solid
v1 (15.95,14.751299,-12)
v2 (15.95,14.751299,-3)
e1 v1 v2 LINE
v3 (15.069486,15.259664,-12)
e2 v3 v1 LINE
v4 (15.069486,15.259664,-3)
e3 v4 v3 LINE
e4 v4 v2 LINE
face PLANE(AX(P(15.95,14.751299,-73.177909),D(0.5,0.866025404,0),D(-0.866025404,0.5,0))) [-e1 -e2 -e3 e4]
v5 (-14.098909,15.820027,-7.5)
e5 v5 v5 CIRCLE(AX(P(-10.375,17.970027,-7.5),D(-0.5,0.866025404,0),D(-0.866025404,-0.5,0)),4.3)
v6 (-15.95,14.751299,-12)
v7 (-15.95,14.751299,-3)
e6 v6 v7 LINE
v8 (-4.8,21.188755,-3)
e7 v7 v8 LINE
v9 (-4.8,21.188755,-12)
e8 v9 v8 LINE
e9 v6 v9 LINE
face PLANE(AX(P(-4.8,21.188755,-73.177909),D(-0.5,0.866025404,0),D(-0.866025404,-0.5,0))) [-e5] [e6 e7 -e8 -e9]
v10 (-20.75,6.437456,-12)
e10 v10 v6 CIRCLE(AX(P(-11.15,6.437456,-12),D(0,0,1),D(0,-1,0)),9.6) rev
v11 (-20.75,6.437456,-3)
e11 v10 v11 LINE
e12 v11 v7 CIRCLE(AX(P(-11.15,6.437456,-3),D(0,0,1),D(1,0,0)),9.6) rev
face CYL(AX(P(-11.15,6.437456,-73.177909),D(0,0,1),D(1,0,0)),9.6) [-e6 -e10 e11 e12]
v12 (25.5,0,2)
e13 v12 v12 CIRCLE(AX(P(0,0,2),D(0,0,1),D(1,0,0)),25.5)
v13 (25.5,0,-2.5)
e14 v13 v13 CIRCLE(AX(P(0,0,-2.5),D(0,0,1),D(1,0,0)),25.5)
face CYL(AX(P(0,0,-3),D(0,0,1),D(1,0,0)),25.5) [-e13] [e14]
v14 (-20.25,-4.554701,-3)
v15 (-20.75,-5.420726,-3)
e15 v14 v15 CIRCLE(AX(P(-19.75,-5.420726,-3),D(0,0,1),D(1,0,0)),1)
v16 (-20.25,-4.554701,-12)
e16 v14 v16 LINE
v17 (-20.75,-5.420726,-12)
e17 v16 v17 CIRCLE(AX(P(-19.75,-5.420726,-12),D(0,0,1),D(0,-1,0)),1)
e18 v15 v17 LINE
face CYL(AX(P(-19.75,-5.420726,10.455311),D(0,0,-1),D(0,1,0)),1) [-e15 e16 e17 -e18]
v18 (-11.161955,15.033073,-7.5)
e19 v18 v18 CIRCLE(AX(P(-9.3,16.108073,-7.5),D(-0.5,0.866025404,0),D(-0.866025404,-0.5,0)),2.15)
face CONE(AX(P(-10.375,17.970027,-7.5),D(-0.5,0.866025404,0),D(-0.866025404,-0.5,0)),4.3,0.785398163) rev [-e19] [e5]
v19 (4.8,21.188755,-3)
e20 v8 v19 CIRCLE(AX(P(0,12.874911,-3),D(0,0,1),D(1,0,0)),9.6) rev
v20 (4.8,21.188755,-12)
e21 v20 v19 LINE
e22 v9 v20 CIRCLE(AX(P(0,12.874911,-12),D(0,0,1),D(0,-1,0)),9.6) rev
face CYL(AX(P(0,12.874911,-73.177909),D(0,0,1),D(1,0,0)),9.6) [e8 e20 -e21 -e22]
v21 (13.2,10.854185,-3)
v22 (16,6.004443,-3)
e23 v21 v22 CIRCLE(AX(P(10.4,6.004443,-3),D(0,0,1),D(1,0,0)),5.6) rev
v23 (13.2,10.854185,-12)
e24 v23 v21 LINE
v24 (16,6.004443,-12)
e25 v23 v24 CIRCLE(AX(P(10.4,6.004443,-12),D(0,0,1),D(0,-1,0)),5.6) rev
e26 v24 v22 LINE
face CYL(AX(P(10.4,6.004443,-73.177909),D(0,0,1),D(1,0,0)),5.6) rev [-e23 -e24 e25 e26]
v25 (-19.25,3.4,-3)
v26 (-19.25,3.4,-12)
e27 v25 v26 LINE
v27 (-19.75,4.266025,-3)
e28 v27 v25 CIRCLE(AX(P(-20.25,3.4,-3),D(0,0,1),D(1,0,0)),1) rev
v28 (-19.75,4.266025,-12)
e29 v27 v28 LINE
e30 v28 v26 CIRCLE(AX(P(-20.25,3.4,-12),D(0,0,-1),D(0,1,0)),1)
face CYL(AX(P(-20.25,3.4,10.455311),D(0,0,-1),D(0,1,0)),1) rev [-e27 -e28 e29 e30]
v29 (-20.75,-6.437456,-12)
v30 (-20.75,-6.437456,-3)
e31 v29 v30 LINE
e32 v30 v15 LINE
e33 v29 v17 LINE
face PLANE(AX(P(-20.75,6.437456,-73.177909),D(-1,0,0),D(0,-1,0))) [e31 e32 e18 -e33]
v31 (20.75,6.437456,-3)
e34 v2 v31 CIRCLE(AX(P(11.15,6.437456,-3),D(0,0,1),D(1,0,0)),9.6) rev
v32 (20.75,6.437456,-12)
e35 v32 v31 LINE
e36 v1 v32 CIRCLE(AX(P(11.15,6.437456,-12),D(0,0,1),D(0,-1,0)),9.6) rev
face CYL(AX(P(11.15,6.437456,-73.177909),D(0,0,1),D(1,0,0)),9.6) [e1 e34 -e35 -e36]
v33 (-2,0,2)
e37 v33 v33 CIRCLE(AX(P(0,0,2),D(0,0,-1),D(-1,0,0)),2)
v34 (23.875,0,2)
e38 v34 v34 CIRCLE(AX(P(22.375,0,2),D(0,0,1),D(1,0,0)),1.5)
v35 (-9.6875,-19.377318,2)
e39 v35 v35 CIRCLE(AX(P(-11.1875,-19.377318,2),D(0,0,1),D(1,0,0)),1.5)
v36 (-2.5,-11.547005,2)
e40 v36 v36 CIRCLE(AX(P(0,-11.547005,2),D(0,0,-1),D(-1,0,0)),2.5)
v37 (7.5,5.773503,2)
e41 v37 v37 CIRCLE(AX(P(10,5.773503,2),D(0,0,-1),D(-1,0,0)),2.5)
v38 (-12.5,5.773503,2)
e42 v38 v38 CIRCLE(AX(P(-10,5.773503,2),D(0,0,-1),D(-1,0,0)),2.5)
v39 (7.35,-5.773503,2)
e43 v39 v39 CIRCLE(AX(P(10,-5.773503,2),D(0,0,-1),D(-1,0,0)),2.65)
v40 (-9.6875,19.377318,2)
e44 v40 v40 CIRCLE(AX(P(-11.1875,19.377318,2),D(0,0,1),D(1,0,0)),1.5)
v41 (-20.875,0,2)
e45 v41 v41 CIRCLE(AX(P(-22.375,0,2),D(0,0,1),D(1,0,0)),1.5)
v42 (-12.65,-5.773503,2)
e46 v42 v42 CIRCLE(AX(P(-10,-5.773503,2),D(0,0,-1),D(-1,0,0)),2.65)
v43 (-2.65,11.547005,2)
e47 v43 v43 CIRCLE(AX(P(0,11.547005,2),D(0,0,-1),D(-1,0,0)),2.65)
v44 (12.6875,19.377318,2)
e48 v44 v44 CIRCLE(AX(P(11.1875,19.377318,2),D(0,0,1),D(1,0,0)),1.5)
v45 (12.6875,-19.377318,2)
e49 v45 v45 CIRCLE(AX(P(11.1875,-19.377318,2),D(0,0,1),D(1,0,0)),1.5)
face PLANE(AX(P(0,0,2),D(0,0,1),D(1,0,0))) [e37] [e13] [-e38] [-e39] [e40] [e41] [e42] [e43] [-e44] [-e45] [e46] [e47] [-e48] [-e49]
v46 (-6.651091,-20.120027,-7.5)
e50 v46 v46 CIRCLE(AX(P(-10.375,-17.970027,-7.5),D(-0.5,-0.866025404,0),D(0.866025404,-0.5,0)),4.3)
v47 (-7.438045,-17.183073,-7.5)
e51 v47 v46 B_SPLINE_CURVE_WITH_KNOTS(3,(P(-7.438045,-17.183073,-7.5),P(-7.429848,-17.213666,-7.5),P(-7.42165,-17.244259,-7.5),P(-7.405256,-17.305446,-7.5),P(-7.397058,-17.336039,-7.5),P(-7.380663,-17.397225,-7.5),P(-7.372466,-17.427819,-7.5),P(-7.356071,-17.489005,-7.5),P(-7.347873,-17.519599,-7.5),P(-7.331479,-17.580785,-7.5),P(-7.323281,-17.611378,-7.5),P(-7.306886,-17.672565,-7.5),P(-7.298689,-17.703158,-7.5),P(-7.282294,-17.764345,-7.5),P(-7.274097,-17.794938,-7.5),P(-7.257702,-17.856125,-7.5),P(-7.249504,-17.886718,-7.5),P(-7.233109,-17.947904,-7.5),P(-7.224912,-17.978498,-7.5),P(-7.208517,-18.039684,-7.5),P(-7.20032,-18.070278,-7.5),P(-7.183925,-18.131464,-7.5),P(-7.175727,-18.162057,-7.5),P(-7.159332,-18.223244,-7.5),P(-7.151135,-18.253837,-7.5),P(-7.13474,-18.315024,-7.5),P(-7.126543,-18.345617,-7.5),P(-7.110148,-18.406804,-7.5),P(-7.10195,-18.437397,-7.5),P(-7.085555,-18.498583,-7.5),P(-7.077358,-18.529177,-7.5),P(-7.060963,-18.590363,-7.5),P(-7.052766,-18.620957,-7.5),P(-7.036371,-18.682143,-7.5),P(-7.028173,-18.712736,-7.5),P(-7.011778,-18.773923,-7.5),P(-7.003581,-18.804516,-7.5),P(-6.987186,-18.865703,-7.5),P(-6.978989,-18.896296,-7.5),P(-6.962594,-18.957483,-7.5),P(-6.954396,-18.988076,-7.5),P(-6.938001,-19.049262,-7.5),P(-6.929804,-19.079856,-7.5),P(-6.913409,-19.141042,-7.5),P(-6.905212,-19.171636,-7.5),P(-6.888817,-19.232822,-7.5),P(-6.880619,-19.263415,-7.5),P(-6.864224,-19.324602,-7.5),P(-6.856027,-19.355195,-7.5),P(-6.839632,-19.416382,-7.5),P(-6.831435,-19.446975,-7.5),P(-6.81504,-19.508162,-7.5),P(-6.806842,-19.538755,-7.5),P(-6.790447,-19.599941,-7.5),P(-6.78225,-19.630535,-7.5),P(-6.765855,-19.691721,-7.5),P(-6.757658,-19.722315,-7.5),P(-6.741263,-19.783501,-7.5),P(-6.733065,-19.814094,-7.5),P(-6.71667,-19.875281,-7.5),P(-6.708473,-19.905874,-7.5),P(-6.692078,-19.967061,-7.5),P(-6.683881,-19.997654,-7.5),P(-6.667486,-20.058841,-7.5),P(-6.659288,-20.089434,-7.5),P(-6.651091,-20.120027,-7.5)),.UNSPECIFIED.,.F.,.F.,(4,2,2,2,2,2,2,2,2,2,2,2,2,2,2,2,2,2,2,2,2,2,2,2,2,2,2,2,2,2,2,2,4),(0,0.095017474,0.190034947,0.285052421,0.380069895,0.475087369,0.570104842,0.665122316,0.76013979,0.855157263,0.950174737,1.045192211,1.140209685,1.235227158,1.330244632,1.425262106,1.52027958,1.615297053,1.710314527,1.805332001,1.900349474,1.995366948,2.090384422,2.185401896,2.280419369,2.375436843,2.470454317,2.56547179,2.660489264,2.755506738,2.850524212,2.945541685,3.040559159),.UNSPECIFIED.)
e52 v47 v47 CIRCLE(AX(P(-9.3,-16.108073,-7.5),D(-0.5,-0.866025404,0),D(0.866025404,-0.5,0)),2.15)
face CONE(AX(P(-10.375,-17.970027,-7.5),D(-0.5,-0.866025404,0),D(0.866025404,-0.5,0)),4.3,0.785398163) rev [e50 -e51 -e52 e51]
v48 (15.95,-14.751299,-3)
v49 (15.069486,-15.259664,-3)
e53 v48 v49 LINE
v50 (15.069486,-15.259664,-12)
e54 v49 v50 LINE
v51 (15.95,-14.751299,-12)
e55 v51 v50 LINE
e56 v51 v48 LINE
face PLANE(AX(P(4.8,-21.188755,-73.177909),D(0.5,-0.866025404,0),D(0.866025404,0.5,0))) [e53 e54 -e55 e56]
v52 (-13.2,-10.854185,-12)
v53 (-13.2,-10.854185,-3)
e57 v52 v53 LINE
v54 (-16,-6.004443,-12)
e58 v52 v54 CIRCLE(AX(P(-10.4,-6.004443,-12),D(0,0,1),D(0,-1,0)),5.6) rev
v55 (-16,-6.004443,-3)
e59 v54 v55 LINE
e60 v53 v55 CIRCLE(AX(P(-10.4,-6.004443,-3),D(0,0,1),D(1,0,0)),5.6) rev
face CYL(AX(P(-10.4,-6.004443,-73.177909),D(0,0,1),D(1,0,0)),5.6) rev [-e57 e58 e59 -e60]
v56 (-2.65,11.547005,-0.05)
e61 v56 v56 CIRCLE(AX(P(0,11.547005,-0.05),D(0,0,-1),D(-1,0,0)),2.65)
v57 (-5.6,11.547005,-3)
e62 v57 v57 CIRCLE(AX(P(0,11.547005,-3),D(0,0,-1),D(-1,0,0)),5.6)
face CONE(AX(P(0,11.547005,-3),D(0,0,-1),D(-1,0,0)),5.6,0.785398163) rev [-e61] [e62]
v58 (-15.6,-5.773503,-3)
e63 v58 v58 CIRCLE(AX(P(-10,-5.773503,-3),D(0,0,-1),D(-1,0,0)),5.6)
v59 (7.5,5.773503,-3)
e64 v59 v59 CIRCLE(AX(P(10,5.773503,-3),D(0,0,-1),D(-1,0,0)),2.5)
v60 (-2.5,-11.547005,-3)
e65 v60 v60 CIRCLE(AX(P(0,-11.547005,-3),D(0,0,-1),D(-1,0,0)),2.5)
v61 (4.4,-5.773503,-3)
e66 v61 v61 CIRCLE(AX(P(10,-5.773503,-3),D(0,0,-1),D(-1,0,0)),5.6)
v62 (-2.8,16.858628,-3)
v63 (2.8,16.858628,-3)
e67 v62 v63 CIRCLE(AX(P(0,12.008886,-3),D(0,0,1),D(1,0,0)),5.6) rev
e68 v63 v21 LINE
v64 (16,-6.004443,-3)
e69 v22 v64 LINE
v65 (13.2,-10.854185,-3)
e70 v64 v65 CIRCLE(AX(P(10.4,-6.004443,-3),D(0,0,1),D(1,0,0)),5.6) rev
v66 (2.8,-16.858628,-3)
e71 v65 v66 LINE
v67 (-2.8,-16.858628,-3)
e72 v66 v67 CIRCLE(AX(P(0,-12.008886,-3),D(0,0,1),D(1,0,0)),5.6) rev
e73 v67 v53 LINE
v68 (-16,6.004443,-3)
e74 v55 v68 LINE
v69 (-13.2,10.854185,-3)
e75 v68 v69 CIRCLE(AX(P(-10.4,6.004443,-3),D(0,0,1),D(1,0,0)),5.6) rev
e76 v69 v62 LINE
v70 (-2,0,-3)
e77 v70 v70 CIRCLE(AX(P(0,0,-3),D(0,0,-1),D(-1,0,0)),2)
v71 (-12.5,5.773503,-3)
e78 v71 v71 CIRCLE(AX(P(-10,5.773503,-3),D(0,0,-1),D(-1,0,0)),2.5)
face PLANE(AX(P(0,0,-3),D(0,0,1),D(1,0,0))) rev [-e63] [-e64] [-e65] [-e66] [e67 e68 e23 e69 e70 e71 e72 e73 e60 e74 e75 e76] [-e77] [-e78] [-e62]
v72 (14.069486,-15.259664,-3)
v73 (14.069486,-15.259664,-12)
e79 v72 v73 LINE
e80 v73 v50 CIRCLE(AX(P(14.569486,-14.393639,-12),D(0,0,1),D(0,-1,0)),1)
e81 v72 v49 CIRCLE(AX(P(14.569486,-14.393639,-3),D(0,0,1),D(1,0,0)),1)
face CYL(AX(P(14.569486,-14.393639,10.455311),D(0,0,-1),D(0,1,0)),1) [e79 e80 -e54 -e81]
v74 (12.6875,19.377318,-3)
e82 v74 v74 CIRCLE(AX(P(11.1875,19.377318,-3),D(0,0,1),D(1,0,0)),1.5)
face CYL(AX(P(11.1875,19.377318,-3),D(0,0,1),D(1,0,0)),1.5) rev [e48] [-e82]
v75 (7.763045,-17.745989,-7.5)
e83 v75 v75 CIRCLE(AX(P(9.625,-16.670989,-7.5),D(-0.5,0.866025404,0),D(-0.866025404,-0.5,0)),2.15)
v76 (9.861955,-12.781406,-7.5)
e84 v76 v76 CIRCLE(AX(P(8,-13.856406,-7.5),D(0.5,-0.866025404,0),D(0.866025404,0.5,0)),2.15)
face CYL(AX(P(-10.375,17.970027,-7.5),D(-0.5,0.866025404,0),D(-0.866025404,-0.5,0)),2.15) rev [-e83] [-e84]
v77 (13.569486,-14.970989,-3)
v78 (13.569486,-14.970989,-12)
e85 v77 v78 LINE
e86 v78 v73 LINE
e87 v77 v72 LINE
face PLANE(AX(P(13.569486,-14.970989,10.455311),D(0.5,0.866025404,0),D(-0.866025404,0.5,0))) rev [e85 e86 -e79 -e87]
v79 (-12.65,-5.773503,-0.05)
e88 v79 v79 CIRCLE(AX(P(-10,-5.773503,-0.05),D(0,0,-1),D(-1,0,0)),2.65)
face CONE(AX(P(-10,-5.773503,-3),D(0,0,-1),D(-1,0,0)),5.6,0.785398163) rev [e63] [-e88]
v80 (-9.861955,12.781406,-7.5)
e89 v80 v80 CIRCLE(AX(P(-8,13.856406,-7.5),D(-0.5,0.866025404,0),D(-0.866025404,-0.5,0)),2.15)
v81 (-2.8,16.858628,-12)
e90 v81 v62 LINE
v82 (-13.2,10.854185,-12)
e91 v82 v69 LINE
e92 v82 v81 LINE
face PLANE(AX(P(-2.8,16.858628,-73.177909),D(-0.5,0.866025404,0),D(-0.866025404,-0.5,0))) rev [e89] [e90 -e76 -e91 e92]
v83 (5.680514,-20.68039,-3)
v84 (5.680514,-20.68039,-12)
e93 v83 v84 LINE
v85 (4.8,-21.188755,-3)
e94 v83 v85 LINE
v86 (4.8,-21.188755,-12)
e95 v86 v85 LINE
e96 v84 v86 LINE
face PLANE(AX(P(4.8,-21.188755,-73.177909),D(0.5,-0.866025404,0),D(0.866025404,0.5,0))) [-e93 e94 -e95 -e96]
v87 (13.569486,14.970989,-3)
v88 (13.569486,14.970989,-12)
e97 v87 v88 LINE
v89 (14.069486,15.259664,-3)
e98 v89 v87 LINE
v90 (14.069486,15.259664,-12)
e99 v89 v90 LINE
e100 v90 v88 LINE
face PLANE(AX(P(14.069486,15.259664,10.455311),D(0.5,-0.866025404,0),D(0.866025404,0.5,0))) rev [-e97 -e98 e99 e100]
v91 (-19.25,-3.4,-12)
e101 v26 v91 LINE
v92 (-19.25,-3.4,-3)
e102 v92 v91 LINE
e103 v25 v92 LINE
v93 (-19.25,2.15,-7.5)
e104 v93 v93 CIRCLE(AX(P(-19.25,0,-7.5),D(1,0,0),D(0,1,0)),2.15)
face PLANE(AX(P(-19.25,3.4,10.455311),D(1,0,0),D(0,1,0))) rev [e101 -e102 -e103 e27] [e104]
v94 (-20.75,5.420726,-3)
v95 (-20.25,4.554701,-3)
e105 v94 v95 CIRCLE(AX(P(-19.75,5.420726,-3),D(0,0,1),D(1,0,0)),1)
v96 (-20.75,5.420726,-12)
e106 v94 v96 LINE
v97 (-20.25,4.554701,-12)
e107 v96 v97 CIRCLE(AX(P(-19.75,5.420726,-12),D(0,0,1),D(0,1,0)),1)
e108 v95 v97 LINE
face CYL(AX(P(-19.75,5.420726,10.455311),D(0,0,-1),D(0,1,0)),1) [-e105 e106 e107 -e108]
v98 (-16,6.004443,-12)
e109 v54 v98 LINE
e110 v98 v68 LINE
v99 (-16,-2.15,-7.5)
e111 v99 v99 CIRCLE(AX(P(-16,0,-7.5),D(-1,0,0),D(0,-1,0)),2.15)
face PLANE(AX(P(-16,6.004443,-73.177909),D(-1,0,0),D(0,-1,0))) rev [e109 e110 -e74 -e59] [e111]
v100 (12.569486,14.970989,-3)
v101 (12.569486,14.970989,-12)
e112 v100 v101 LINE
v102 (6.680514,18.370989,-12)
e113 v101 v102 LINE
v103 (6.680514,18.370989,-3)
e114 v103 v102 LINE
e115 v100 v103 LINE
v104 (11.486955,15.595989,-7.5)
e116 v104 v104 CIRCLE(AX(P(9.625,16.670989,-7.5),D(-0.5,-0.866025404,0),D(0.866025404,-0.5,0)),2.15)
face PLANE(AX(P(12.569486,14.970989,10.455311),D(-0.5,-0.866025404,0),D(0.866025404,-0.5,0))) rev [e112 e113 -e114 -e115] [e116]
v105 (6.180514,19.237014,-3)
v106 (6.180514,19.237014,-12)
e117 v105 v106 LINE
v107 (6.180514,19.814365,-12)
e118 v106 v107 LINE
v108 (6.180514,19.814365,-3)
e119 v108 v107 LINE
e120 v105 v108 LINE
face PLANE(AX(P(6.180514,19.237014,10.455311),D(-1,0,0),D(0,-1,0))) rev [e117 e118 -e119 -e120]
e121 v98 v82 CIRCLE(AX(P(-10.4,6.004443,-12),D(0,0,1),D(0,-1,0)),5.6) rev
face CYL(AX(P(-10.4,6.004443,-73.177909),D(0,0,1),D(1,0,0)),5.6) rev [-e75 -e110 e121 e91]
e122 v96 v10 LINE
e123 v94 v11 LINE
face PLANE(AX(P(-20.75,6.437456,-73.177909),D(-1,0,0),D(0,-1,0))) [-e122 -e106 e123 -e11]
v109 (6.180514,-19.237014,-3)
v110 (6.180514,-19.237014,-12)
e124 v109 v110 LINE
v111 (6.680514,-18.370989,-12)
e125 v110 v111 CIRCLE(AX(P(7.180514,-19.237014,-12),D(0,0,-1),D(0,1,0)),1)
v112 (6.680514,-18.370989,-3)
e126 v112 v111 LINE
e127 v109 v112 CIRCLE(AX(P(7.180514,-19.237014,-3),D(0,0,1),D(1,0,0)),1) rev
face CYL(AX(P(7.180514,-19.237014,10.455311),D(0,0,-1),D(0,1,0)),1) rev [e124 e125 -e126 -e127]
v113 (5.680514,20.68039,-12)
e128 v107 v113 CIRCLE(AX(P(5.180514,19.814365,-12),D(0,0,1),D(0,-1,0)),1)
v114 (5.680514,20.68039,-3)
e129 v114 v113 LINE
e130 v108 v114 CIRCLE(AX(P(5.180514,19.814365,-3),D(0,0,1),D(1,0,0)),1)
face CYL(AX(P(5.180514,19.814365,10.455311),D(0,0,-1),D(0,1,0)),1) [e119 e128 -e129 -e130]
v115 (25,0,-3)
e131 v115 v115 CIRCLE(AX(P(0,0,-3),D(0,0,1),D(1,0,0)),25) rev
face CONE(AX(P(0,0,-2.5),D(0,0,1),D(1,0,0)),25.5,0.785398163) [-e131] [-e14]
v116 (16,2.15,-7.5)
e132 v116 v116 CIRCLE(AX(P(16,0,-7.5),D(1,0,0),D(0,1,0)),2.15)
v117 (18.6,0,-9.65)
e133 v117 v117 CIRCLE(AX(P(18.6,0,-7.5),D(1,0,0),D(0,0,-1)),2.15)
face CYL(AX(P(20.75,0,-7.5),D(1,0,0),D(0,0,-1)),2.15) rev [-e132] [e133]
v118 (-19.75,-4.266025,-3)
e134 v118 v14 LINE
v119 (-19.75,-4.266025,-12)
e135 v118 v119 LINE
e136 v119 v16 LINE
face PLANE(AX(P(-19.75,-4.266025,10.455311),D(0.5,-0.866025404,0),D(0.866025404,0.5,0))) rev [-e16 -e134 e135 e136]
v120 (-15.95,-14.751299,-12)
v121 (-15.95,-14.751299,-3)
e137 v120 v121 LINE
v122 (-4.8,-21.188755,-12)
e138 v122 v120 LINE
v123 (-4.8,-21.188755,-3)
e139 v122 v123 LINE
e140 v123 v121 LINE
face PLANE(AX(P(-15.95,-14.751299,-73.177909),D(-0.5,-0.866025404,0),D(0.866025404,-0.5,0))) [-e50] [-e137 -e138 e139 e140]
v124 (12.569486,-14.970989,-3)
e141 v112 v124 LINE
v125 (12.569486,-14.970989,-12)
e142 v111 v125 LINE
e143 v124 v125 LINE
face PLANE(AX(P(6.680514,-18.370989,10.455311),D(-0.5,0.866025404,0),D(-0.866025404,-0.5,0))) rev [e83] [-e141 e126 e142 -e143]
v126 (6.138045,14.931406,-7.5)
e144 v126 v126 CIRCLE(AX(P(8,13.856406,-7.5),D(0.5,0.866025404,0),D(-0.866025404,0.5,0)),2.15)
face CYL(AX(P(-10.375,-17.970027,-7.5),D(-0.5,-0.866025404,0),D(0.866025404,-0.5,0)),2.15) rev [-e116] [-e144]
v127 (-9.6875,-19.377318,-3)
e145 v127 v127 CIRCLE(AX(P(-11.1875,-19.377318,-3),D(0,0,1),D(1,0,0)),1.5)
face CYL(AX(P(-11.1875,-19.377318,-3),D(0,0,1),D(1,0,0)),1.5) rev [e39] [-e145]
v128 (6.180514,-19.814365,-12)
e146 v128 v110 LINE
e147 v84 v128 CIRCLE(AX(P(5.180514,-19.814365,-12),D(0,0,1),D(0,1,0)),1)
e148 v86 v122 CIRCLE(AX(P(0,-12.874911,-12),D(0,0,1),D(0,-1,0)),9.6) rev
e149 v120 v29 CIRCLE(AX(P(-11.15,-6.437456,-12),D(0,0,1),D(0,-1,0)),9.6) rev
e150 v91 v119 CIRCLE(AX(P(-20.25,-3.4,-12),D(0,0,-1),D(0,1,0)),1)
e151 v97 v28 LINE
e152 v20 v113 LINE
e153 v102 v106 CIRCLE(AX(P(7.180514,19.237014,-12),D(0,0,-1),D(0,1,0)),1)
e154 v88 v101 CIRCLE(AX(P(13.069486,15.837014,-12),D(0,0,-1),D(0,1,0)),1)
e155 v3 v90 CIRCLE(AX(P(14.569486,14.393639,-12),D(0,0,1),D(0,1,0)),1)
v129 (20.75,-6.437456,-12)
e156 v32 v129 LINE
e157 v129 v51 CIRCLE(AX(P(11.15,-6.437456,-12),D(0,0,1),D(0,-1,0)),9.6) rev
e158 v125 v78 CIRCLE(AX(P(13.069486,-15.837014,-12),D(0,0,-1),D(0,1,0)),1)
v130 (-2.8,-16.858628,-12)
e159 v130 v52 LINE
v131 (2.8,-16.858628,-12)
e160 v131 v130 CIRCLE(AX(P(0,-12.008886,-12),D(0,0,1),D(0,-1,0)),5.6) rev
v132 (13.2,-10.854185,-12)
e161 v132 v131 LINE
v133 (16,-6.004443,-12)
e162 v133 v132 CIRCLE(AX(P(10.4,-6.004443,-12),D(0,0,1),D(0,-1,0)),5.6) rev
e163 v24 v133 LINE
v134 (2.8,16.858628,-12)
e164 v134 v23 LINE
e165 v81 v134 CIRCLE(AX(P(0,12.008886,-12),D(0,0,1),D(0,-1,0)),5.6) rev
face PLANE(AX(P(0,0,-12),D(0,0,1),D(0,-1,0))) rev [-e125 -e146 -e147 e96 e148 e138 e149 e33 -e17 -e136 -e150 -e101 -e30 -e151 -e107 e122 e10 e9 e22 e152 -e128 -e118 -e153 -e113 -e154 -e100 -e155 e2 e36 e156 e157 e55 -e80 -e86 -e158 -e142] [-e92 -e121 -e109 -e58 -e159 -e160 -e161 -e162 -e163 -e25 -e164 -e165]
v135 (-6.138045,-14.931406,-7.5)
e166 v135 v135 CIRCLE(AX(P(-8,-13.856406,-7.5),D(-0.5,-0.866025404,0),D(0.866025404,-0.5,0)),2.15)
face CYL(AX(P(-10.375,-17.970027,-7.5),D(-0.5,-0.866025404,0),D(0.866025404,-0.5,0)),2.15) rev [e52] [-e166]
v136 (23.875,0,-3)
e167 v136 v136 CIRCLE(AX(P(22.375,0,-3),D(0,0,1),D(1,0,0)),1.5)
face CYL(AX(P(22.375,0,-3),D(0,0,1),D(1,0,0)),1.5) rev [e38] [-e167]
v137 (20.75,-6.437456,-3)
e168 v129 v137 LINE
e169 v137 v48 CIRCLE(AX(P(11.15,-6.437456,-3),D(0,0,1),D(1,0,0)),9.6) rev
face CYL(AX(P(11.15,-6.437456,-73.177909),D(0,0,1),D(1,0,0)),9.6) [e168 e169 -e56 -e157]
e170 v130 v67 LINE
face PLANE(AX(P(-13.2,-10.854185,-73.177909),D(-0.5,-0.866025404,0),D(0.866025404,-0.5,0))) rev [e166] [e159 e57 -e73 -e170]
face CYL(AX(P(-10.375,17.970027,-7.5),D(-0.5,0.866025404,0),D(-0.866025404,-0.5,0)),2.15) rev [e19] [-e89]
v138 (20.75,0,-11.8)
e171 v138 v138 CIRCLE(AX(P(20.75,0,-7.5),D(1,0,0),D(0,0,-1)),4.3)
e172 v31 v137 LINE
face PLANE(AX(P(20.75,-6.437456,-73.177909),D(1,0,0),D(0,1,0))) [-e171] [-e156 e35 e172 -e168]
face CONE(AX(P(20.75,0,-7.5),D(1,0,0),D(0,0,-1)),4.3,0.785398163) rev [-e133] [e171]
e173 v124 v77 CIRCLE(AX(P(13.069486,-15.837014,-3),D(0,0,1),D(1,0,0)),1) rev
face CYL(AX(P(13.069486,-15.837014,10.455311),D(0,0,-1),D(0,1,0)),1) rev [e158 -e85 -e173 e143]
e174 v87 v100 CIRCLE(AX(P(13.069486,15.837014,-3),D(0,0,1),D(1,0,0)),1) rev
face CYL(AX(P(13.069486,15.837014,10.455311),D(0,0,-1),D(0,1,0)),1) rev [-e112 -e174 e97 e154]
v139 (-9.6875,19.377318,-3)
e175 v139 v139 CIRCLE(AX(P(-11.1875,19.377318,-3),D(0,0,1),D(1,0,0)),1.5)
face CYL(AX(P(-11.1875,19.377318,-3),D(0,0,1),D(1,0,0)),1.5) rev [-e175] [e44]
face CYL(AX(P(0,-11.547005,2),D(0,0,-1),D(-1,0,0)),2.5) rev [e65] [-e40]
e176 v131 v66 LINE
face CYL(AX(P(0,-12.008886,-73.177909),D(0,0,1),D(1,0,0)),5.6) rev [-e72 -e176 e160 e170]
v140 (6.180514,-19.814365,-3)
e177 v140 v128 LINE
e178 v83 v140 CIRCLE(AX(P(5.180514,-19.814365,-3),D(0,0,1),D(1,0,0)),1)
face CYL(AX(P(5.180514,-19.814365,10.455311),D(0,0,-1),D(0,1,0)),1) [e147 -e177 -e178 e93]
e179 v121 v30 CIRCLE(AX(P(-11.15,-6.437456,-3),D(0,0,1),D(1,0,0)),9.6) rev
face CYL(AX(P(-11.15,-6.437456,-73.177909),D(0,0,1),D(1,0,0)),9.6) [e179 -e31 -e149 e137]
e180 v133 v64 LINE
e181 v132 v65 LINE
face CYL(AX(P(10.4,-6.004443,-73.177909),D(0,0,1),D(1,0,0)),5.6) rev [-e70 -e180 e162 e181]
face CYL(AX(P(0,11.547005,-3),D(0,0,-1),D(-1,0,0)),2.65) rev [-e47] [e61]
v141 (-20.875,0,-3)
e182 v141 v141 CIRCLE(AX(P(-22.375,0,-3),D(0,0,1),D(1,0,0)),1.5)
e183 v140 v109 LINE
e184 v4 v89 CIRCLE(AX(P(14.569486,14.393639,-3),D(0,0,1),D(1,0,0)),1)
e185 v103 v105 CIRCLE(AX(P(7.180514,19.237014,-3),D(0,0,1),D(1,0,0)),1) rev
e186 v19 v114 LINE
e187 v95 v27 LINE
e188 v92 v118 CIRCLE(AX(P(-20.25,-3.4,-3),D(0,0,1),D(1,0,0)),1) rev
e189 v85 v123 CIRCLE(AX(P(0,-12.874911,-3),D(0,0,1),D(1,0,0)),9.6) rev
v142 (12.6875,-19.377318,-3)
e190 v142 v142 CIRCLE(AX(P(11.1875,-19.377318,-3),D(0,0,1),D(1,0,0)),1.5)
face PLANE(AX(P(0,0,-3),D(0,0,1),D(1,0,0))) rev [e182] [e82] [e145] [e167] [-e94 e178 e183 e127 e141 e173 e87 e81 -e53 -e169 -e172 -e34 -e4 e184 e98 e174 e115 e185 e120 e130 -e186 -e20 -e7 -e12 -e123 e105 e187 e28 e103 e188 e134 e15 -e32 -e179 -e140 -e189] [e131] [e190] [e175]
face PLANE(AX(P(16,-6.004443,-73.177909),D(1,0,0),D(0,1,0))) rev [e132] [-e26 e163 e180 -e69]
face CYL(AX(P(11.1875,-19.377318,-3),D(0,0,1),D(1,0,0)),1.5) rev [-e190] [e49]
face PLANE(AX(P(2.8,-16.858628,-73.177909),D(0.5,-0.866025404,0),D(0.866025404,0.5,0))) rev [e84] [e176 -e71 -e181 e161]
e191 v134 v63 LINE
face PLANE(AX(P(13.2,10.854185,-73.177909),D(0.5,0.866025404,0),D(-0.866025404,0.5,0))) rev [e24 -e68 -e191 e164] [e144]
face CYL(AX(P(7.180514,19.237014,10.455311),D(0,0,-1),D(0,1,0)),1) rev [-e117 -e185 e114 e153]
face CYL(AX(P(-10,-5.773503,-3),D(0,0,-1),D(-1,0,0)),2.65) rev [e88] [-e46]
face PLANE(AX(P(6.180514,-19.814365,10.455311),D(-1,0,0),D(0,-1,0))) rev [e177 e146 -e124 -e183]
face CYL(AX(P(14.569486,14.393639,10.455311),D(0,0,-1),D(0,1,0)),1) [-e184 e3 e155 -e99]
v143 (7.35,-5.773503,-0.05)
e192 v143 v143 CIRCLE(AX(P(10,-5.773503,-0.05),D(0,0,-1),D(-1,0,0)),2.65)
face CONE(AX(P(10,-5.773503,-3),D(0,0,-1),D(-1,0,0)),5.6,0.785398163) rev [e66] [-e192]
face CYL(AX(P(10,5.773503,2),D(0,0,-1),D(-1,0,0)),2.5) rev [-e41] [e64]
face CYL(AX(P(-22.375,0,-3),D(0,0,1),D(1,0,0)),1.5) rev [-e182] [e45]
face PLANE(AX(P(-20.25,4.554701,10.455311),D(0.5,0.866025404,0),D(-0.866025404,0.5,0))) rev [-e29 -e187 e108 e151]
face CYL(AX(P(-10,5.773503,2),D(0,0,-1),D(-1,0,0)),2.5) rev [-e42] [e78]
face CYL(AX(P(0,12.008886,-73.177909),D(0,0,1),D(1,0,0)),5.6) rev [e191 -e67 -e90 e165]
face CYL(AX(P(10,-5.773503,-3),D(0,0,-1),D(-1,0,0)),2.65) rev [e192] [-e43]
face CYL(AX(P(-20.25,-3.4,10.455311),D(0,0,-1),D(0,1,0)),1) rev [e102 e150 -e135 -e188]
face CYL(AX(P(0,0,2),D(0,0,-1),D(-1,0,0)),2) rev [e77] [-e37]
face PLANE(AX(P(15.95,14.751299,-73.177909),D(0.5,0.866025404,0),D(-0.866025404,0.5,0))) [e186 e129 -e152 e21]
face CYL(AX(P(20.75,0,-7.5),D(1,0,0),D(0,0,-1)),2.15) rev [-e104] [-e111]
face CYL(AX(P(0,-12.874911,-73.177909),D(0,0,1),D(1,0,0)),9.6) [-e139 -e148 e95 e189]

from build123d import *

# Parameters (mm, degrees)
EXTRUDE_1_DEPTH               = 12
SKETCH_3_R                    = 2
CUT_EXTRUDE_1_DEPTH           = 53.426697831
SKETCH_4_R                    = 2
CUT_EXTRUDE_2_DEPTH           = 53.426697831
CUT_EXTRUDE_3_DEPTH           = 49.696731149
CUT_EXTRUDE_3_DEPTH_BACK      = 49.696731149
SKETCH_5_R                    = 2
EXTRUDE_4_DEPTH               = 2
EXTRUDE_4_DEPTH_BACK          = 3
SKETCH_2_R                    = 25.5
SKETCH_2_R_2                  = 1.5
CUT_EXTRUDE_5_REACH           = 40.685
SKETCH_14_R                   = 2.5
CUT_EXTRUDE_6_DEPTH           = 38.16853508
HOLE_WIZARD_4_AT_2_COUNT      = 2
HOLE_WIZARD_4_AT_2_PITCH      = 20
HOLE_WIZARD_4_AT_3_COUNT      = 2
HOLE_WIZARD_4_AT_3_PITCH      = 20
CHAMFER_1_SIZE                = 0.5
SKETCH_17_R                   = 2
CUT_EXTRUDE_7_DEPTH           = 38.16853508
HOLE_START                    = -19.25
HOLE_WIZARD_4_2_OUTLINE_R     = 2.15
HOLE_WIZARD_4_2_OUTLINE_R_2   = 2
HOLE_WIZARD_4_2_DEPTH         = 3.25
HOLE_START_2                  = 16
HOLE_WIZARD_4_2_2_OUTLINE_R   = 2.15
HOLE_WIZARD_4_2_2_OUTLINE_R_2 = 2
HOLE_WIZARD_4_2_2_DEPTH       = 3.25
HOLE_WIZARD_4_2_3_OUTLINE_R   = 2.15
HOLE_WIZARD_4_2_3_OUTLINE_R_2 = 2
HOLE_WIZARD_4_2_3_DEPTH       = 3.25


# Read off the part's stored shape, not the designer's step: 打孔尺寸(%根据十字)槽沉头木螺钉的类型4
with BuildPart() as part:
    # 草图1 → 凸台-拉伸1 (new body)
    with BuildSketch(Plane.XY):
        with BuildLine():
            Line((20.75, -6.437455501), (20.75, 6.437455501))
            ThreePointArc((20.75, 6.437455501), (19.463843876, 11.237455501), (15.95, 14.751299378))
            Line((15.95, 14.751299378), (4.8, 21.188754879))
            ThreePointArc((4.8, 21.188754879), (0, 22.474911003), (-4.8, 21.188754879))
            Line((-4.8, 21.188754879), (-15.95, 14.751299378))
            ThreePointArc((-15.95, 14.751299378), (-19.463843876, 11.237455501), (-20.75, 6.437455501))
            Line((-20.75, 6.437455501), (-20.75, -6.437455501))
            ThreePointArc((-20.75, -6.437455501), (-19.463843876, -11.237455501), (-15.95, -14.751299378))
            Line((-15.95, -14.751299378), (-4.8, -21.188754879))
            ThreePointArc((-4.8, -21.188754879), (0, -22.474911003), (4.8, -21.188754879))
            Line((4.8, -21.188754879), (15.95, -14.751299378))
            ThreePointArc((15.95, -14.751299378), (19.463843876, -11.237455501), (20.75, -6.437455501))
        make_face()
        with BuildLine():
            Line((-16, 6.0044428), (-16, -6.0044428))
            ThreePointArc((-16, -6.0044428), (-15.249742261, -8.8044428), (-13.2, -10.854185061))
            Line((-13.2, -10.854185061), (-2.8, -16.85862786))
            ThreePointArc((-2.8, -16.85862786), (0, -17.608885599), (2.8, -16.85862786))
            Line((2.8, -16.85862786), (13.2, -10.854185061))
            ThreePointArc((13.2, -10.854185061), (15.249742261, -8.8044428), (16, -6.0044428))
            Line((16, -6.0044428), (16, 6.0044428))
            ThreePointArc((16, 6.0044428), (15.249742261, 8.8044428), (13.2, 10.854185061))
            Line((13.2, 10.854185061), (2.8, 16.85862786))
            ThreePointArc((2.8, 16.85862786), (0, 17.608885599), (-2.8, 16.85862786))
            Line((-2.8, 16.85862786), (-13.2, 10.854185061))
            ThreePointArc((-13.2, 10.854185061), (-15.249742261, 8.8044428), (-16, 6.0044428))
        make_face(mode=Mode.SUBTRACT)
    extrude(amount=-EXTRUDE_1_DEPTH)

    # 草图3 → 切除-拉伸1 (cut, through all)
    with BuildSketch(Plane(origin=(10.375, 17.970027129, 0), x_dir=(0.8660254037844384, -0.5000000000000004, 0), z_dir=(0.5000000000000004, 0.8660254037844384, 0))):
        with Locations(Location((0, 7.5, 0), (0, 0, 180))):
            Circle(SKETCH_3_R)
    extrude(amount=-CUT_EXTRUDE_1_DEPTH, mode=Mode.SUBTRACT)

    # 草图4 → 切除-拉伸2 (cut, through all)
    with BuildSketch(Plane(origin=(-10.375, 17.970027129, 0), x_dir=(0.8660254037844387, 0.4999999999999999, 0), z_dir=(-0.49999999999999994, 0.8660254037844388, 0))):
        with Locations(Location((0, 7.5, 0), (0, 0, 180))):
            Circle(SKETCH_4_R)
    extrude(amount=-CUT_EXTRUDE_2_DEPTH, mode=Mode.SUBTRACT)

    # 草图5 → 切除-拉伸3 (cut, two sides: drawn at the far end of the back side and taken through both)
    with BuildSketch(Plane.ZY.offset(20.75).offset(-CUT_EXTRUDE_3_DEPTH_BACK)):
        with Locations(Location((-7.5, 0, 0), (0, 0, 270))):
            Circle(SKETCH_5_R)
    extrude(amount=CUT_EXTRUDE_3_DEPTH + CUT_EXTRUDE_3_DEPTH_BACK, mode=Mode.SUBTRACT)

    # 草图2 → 凸台-拉伸4 (add, two sides: drawn at the far end of the back side and taken through both)
    with BuildSketch(Plane.XY.offset(-EXTRUDE_4_DEPTH_BACK)):
        Circle(SKETCH_2_R)
        with Locations((-11.1875, 19.37731841)):
            Circle(SKETCH_2_R_2, mode=Mode.SUBTRACT)
        with Locations((11.1875, 19.37731841)):
            Circle(SKETCH_2_R_2, mode=Mode.SUBTRACT)
        with Locations((22.375, 0)):
            Circle(SKETCH_2_R_2, mode=Mode.SUBTRACT)
        with Locations((11.1875, -19.37731841)):
            Circle(SKETCH_2_R_2, mode=Mode.SUBTRACT)
        with Locations((-11.1875, -19.37731841)):
            Circle(SKETCH_2_R_2, mode=Mode.SUBTRACT)
        with Locations((-22.375, 0)):
            Circle(SKETCH_2_R_2, mode=Mode.SUBTRACT)
    extrude(amount=EXTRUDE_4_DEPTH + EXTRUDE_4_DEPTH_BACK)

    # 切除-拉伸5: up to this face of the body (flat: up to its plane)
    cut_extrude_5_end = Plane(part.part.faces().sort_by_distance((0, 0, -3))[0])
    # 草图13 → 切除-拉伸5 (cut, up to the picked face)
    with BuildSketch(Plane(origin=(0, 0, -12), x_dir=(-1, 0, 0), z_dir=(0, 0, -1)), mode=Mode.PRIVATE) as cut_extrude_5_sk1:
        with BuildLine():
            Line((21.415437246, -6.437455501), (20.75, -6.437455501))
            Line((20.75, -6.437455501), (20.75, -5.420725942))
            ThreePointArc((20.75, -5.420725942), (20.616025404, -4.920725942), (20.25, -4.554700538))
            Line((20.25, -4.554700538), (19.75, -4.266025404))
            ThreePointArc((19.75, -4.266025404), (19.383974596, -3.9), (19.25, -3.4))
            Line((19.25, -3.4), (19.25, 3.4))
            ThreePointArc((19.25, 3.4), (19.383974596, 3.9), (19.75, 4.266025404))
            Line((19.75, 4.266025404), (20.25, 4.554700538))
            ThreePointArc((20.25, 4.554700538), (20.616025404, 4.920725942), (20.75, 5.420725942))
            Line((20.75, 5.420725942), (20.75, 6.437455501))
            Line((20.75, 6.437455501), (21.415437246, 6.437455501))
            Line((21.415437246, 6.437455501), (21.415437246, -6.437455501))
        make_face()
    cut_extrude_5_tool1 = split(extrude(cut_extrude_5_sk1.sketch, amount=-CUT_EXTRUDE_5_REACH, mode=Mode.PRIVATE), bisect_by=cut_extrude_5_end, keep=Keep.BOTH, mode=Mode.PRIVATE)
    # 草图13 → 切除-拉伸5 (cut, up to the picked face)
    with BuildSketch(Plane(origin=(0, 0, -12), x_dir=(-1, 0, 0), z_dir=(0, 0, -1)), mode=Mode.PRIVATE) as cut_extrude_5_sk2:
        with BuildLine():
            Line((-16.282718623, -15.327584937), (-15.95, -14.751299378))
            Line((-15.95, -14.751299378), (-15.069486373, -15.259664157))
            ThreePointArc((-15.069486373, -15.259664157), (-14.569486373, -15.393638754), (-14.069486373, -15.259664157))
            Line((-14.069486373, -15.259664157), (-13.569486373, -14.970989023))
            ThreePointArc((-13.569486373, -14.970989023), (-13.069486373, -14.837014427), (-12.569486373, -14.970989023))
            Line((-12.569486373, -14.970989023), (-6.680513627, -18.370989023))
            ThreePointArc((-6.680513627, -18.370989023), (-6.314488223, -18.737014427), (-6.180513627, -19.237014427))
            Line((-6.180513627, -19.237014427), (-6.180513627, -19.814364696))
            ThreePointArc((-6.180513627, -19.814364696), (-6.046539031, -20.314364696), (-5.680513627, -20.6803901))
            Line((-5.680513627, -20.6803901), (-4.8, -21.188754879))
            Line((-4.8, -21.188754879), (-5.132718623, -21.765040439))
            Line((-5.132718623, -21.765040439), (-16.282718623, -15.327584937))
        make_face()
    cut_extrude_5_tool2 = split(extrude(cut_extrude_5_sk2.sketch, amount=-CUT_EXTRUDE_5_REACH, mode=Mode.PRIVATE), bisect_by=cut_extrude_5_end, keep=Keep.BOTH, mode=Mode.PRIVATE)
    # 草图13 → 切除-拉伸5 (cut, up to the picked face)
    with BuildSketch(Plane(origin=(0, 0, -12), x_dir=(-1, 0, 0), z_dir=(0, 0, -1)), mode=Mode.PRIVATE) as cut_extrude_5_sk3:
        with BuildLine():
            Line((-5.132718623, 21.765040439), (-4.8, 21.188754879))
            Line((-4.8, 21.188754879), (-5.680513627, 20.6803901))
            ThreePointArc((-5.680513627, 20.6803901), (-6.046539031, 20.314364696), (-6.180513627, 19.814364696))
            Line((-6.180513627, 19.814364696), (-6.180513627, 19.237014427))
            ThreePointArc((-6.180513627, 19.237014427), (-6.314488223, 18.737014427), (-6.680513627, 18.370989023))
            Line((-6.680513627, 18.370989023), (-12.569486373, 14.970989023))
            ThreePointArc((-12.569486373, 14.970989023), (-13.069486373, 14.837014427), (-13.569486373, 14.970989023))
            Line((-13.569486373, 14.970989023), (-14.069486373, 15.259664157))
            ThreePointArc((-14.069486373, 15.259664157), (-14.569486373, 15.393638754), (-15.069486373, 15.259664157))
            Line((-15.069486373, 15.259664157), (-15.95, 14.751299378))
            Line((-15.95, 14.751299378), (-16.282718623, 15.327584937))
            Line((-16.282718623, 15.327584937), (-5.132718623, 21.765040439))
        make_face()
    cut_extrude_5_tool3 = split(extrude(cut_extrude_5_sk3.sketch, amount=-CUT_EXTRUDE_5_REACH, mode=Mode.PRIVATE), bisect_by=cut_extrude_5_end, keep=Keep.BOTH, mode=Mode.PRIVATE)
    add(cut_extrude_5_tool1.solids().sort_by(Axis((-20.4468, 0, -12), (0, 0, 1)))[0], mode=Mode.SUBTRACT)
    add(cut_extrude_5_tool2.solids().sort_by(Axis((10.2234, -17.707448, -12), (0, 0, 1)))[0], mode=Mode.SUBTRACT)
    add(cut_extrude_5_tool3.solids().sort_by(Axis((10.2234, 17.707448, -12), (0, 0, 1)))[0], mode=Mode.SUBTRACT)

    # 草图14 → 切除-拉伸6 (cut, through all)
    with BuildSketch(Plane(origin=(0, 0, -3), x_dir=(-1, 0, 0), z_dir=(0, 0, -1))):
        with Locations((-10, 5.773502692)):
            Circle(SKETCH_14_R)
        with Locations((10, 5.773502692)):
            Circle(SKETCH_14_R)
        with Locations((0, -11.547005384)):
            Circle(SKETCH_14_R)
        with Locations((-10, -5.773502692)):
            Circle(SKETCH_14_R)
        with Locations((0, 11.547005384)):
            Circle(SKETCH_14_R)
        with Locations((10, -5.773502692)):
            Circle(SKETCH_14_R)
    extrude(amount=-CUT_EXTRUDE_6_DEPTH, mode=Mode.SUBTRACT)

    # 草图16 → Hole Wizard 4 (revolve, cut)
    with BuildSketch(Plane(origin=(0, 11.547005384, -3), x_dir=(0, 1, 0), z_dir=(1, 0, 0))):
        Polygon((0, 0), (0, 5), (2.65, 5), (2.65, 2.95), (5.6, 0), align=None)
    hole_wizard_4 = revolve(axis=Axis((0, 11.547005384, -9.35), (0, 0, 1)), mode=Mode.SUBTRACT)

    # Hole Wizard 4 at 2: Hole Wizard 4 ×2
    with Locations(*[Vector(0.5000000000000001, -0.8660254037844387, 0) * (i * HOLE_WIZARD_4_AT_2_PITCH) for i in range(1, HOLE_WIZARD_4_AT_2_COUNT)]):
        add(hole_wizard_4, mode=Mode.SUBTRACT)

    # Hole Wizard 4 at 3: Hole Wizard 4 ×2
    with Locations(*[Vector(-0.49999999999999967, -0.8660254037844389, 0) * (i * HOLE_WIZARD_4_AT_3_PITCH) for i in range(1, HOLE_WIZARD_4_AT_3_COUNT)]):
        add(hole_wizard_4, mode=Mode.SUBTRACT)

    # 倒角1
    chamfer_1_edges = [part.edges().sort_by_distance(p)[0] for p in [
        (-25.5, 0, -3),
    ]]
    chamfer(chamfer_1_edges, length=CHAMFER_1_SIZE)

    # 草图17 → 切除-拉伸7 (cut, through all)
    with BuildSketch(Plane(origin=(0, 0, -3), x_dir=(-1, 0, 0), z_dir=(0, 0, -1))):
        Circle(SKETCH_17_R)
    extrude(amount=-CUT_EXTRUDE_7_DEPTH, mode=Mode.SUBTRACT)

    # Hole Wizard 4 2 outline → Hole Wizard 4 2 (cut)
    with BuildSketch(Plane.YZ.offset(HOLE_START)):
        with Locations((0, -7.5)):
            Circle(HOLE_WIZARD_4_2_OUTLINE_R)
        with Locations((0, -7.5)):
            Circle(HOLE_WIZARD_4_2_OUTLINE_R_2, mode=Mode.SUBTRACT)
    extrude(amount=HOLE_WIZARD_4_2_DEPTH, mode=Mode.SUBTRACT)

    # Hole Wizard 4 2 2 outline → Hole Wizard 4 2 2 (cut)
    with BuildSketch(Plane(origin=(0, 0, 0), x_dir=(0.8660254037844384, -0.5000000000000003, 0), z_dir=(0.5000000000000003, 0.8660254037844385, 0)).offset(HOLE_START_2)):
        with Locations((0, 7.5)):
            Circle(HOLE_WIZARD_4_2_2_OUTLINE_R)
        with Locations((0, 7.5)):
            Circle(HOLE_WIZARD_4_2_2_OUTLINE_R_2, mode=Mode.SUBTRACT)
    extrude(amount=HOLE_WIZARD_4_2_2_DEPTH, mode=Mode.SUBTRACT)

    # Hole Wizard 4 2 3 outline → Hole Wizard 4 2 3 (cut)
    with BuildSketch(Plane(origin=(0, 0, 0), x_dir=(0.8660254037844386, 0.4999999999999999, 0), z_dir=(0.4999999999999999, -0.8660254037844388, 0)).offset(HOLE_START_2)):
        with Locations((0, -7.5)):
            Circle(HOLE_WIZARD_4_2_3_OUTLINE_R)
        with Locations((0, -7.5)):
            Circle(HOLE_WIZARD_4_2_3_OUTLINE_R_2, mode=Mode.SUBTRACT)
    extrude(amount=HOLE_WIZARD_4_2_3_DEPTH, mode=Mode.SUBTRACT)

    # Hole Wizard 4 2 4 outline → Hole Wizard 4 2 4 (revolve, cut)
    with BuildSketch(Plane.YX.offset(7.5)):
        Polygon((2, 16), (2.15, 16), (2.15, 18.6), (4.3, 20.75), (2, 20.75), align=None)
    revolve(axis=Axis((0, 0, -7.5), (1, 0, 0)), mode=Mode.SUBTRACT)

    # Hole Wizard 4 2 5 outline → Hole Wizard 4 2 5 (revolve, cut)
    with BuildSketch(Plane(origin=(0, 0, -7.5), x_dir=(0.8660254037844384, -0.5000000000000003, 0), z_dir=(0, 0, 1))):
        Polygon((2, -20.75), (4.3, -20.75), (2.15, -18.6), (2.15, -16), (2, -16), align=None)
    revolve(axis=Axis((0, 0, -7.5), (0.5000000000000003, 0.8660254037844384, 0)), mode=Mode.SUBTRACT)

    # Hole Wizard 4 2 6 outline → Hole Wizard 4 2 6 (revolve, cut)
    with BuildSketch(Plane(origin=(0, 0, -7.5), x_dir=(0.8660254037844386, 0.4999999999999999, 0), z_dir=(0, 0, -1))):
        Polygon((2.15, -18.6), (2.15, -16), (2, -16), (2, -20.75), (4.3, -20.75), align=None)
    revolve(axis=Axis((0, 0, -7.5), (0.4999999999999999, -0.8660254037844386, 0)), mode=Mode.SUBTRACT)


solid = part.part
